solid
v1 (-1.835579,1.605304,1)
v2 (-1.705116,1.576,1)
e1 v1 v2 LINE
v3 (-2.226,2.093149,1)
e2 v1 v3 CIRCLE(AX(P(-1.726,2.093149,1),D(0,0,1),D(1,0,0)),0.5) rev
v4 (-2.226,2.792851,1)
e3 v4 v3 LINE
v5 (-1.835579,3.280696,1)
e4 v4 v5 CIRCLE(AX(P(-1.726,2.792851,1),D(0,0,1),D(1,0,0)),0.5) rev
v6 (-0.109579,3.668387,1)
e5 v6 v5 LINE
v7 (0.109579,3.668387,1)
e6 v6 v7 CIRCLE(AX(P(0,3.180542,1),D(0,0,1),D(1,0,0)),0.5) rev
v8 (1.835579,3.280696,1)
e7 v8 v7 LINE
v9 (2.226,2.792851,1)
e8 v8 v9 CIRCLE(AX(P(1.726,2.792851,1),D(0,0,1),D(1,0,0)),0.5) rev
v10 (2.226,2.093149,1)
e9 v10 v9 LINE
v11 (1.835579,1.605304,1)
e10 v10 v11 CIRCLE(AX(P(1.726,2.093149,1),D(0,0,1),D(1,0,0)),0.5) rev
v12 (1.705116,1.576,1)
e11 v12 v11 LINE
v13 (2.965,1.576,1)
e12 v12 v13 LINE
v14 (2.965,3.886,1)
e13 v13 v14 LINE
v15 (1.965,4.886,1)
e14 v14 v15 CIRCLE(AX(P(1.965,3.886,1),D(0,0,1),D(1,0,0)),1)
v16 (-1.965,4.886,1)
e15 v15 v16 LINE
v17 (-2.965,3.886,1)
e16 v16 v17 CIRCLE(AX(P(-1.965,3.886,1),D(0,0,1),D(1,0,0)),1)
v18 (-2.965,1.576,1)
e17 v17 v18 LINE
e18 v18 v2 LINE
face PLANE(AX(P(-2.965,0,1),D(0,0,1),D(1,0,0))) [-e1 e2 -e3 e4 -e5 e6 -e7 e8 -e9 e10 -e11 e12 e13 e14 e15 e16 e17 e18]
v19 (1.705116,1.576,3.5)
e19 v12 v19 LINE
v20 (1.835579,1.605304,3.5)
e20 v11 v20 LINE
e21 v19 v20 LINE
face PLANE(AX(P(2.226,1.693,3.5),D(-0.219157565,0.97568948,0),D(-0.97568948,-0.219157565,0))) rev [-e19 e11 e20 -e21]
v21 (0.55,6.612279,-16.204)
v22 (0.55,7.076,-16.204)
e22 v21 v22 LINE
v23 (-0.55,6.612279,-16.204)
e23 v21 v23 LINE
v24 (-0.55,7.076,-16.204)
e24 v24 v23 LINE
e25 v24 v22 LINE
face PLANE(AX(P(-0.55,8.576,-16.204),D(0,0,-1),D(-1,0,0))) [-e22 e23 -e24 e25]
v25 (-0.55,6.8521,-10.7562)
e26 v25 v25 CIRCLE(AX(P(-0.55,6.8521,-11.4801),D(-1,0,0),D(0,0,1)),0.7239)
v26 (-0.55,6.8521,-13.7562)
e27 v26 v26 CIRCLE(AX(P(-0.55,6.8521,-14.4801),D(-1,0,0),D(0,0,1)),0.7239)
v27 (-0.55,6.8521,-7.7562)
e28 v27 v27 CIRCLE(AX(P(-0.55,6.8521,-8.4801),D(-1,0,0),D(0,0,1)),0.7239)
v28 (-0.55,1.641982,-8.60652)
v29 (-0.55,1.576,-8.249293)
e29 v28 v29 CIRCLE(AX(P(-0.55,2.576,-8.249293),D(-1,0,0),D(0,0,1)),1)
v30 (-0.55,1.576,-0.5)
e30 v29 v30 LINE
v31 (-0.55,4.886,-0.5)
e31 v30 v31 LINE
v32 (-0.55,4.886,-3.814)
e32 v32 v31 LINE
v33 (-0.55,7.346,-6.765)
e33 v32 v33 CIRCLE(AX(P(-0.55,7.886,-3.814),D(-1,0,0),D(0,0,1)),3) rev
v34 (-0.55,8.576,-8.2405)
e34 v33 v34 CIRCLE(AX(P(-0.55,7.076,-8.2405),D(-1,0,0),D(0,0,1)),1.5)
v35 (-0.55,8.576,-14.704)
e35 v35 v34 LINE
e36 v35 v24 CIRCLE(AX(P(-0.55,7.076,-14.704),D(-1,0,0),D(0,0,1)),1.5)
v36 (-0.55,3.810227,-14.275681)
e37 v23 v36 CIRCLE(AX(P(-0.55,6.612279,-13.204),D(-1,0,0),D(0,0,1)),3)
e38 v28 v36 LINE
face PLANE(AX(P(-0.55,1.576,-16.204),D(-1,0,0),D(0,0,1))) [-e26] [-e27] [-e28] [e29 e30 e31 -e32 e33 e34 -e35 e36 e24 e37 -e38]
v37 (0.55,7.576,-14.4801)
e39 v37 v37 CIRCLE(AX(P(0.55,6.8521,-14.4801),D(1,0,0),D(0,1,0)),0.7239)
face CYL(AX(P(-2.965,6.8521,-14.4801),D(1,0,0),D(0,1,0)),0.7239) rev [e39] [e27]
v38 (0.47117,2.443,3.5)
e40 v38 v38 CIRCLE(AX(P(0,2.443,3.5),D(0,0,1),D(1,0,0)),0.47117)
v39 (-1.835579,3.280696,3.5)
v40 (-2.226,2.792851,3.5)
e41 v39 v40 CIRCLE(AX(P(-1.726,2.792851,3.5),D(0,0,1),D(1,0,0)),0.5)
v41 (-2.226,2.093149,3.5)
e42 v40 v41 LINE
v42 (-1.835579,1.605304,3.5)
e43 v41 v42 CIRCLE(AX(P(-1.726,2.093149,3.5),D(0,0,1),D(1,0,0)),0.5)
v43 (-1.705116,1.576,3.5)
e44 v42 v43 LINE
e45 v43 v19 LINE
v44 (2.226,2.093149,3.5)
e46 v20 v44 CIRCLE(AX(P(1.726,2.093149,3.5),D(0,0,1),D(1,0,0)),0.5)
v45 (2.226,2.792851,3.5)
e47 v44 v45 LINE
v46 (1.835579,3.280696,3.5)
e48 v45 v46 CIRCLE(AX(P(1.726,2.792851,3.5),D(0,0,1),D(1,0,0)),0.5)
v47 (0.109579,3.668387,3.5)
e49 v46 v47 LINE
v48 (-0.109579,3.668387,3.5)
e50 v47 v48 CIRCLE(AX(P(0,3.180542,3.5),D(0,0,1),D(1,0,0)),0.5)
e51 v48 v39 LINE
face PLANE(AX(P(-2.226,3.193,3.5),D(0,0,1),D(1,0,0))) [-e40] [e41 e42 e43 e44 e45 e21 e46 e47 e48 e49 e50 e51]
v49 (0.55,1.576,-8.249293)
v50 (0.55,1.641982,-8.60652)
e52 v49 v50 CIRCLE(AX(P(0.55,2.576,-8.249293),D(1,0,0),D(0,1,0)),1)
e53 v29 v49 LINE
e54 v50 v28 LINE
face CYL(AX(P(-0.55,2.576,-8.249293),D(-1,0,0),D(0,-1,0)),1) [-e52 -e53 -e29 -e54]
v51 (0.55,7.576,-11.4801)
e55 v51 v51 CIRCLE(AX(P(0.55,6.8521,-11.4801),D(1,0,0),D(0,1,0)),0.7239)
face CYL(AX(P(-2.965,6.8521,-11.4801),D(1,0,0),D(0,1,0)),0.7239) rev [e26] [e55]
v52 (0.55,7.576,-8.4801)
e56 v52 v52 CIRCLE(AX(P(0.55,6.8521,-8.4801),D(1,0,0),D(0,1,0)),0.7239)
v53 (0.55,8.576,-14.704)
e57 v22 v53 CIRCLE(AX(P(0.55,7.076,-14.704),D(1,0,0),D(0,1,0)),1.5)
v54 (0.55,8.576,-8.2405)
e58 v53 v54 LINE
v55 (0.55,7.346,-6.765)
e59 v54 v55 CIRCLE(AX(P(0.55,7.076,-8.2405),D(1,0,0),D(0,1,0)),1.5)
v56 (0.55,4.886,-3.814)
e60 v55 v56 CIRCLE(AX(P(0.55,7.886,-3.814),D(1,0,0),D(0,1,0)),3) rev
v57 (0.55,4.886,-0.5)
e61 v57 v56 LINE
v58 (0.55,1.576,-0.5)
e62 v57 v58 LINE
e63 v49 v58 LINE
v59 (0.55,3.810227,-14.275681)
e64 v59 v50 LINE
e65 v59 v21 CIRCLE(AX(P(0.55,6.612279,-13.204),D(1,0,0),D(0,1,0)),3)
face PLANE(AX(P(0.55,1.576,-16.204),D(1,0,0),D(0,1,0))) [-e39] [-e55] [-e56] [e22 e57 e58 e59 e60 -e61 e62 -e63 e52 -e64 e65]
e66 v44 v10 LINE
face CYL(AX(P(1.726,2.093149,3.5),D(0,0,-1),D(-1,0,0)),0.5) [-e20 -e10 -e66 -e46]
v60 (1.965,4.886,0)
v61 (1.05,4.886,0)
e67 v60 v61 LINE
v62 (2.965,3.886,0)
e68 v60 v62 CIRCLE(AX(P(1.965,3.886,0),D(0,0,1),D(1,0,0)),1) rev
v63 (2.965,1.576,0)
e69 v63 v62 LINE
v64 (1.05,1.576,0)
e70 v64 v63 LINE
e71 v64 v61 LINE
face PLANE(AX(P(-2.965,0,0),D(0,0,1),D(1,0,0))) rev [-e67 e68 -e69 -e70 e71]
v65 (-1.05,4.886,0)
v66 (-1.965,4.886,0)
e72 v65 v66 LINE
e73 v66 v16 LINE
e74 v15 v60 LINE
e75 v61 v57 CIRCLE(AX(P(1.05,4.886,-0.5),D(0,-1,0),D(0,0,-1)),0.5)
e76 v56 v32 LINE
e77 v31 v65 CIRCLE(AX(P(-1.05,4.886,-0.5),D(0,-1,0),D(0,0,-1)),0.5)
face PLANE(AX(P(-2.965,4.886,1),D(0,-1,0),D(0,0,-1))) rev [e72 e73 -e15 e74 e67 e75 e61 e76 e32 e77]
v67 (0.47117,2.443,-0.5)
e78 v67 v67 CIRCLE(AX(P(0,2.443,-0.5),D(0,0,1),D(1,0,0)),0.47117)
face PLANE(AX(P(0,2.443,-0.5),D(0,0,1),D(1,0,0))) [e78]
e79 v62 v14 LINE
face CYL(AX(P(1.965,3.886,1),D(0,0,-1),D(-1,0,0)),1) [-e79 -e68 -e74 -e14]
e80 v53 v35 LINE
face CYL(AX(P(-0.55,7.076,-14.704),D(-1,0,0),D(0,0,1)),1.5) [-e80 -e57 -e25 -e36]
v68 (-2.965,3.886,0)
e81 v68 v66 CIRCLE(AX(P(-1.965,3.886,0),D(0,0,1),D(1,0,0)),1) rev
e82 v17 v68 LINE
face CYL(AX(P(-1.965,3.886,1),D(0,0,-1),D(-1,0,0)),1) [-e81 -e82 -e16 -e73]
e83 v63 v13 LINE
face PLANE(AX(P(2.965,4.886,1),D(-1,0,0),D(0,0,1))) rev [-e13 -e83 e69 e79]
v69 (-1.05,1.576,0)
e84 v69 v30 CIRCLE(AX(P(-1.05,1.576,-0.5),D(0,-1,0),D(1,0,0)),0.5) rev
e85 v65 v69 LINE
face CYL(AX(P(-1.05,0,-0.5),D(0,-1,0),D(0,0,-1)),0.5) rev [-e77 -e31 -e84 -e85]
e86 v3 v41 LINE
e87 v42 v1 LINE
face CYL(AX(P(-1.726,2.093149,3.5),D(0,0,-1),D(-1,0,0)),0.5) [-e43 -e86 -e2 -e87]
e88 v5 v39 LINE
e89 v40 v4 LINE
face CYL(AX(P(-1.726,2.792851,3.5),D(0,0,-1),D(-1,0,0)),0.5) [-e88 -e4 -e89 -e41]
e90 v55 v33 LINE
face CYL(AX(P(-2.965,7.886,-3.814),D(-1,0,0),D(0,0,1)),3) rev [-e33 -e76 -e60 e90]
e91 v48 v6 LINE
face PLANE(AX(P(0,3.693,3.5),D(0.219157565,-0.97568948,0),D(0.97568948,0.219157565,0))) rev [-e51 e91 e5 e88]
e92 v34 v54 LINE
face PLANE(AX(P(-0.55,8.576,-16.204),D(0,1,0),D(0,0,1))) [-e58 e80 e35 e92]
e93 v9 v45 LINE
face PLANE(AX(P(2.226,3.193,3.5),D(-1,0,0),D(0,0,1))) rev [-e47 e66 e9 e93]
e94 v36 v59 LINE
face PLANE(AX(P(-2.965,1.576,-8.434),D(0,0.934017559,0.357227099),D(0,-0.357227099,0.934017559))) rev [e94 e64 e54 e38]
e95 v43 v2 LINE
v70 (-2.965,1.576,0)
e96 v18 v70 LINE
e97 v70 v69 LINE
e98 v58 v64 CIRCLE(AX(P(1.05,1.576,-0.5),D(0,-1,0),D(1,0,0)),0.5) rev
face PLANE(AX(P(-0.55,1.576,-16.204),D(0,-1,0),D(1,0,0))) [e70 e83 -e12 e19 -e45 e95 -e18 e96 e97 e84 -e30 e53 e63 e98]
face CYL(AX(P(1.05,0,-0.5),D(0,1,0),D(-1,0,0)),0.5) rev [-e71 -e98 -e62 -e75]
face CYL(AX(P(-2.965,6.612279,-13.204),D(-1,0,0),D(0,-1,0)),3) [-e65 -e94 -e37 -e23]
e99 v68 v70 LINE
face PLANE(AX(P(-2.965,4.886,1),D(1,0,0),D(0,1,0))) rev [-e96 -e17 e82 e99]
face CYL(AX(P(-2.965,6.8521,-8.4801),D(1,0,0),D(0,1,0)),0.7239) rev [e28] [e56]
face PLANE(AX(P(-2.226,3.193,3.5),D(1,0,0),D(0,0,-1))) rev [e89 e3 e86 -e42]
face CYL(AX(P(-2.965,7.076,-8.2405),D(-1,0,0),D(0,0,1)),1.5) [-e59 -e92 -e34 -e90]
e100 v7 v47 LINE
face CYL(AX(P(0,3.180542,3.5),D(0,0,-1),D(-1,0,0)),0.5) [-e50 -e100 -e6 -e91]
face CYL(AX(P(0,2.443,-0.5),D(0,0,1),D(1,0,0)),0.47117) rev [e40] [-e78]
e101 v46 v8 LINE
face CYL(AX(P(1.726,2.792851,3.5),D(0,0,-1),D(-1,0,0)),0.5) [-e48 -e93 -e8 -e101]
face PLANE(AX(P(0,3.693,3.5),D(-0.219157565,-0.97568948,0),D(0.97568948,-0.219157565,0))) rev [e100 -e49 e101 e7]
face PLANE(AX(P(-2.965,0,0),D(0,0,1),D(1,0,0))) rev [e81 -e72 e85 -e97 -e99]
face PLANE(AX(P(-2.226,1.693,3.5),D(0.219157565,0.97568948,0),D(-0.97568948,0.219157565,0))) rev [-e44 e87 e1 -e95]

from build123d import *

# Parameters (mm, degrees)
SKETCH3_W                      = 5.93
SKETCH3_H                      = 4.886
MOUNT_BASE_PLATE_DEPTH         = 1
HORN_LEVER_PROFILE_W           = 1.1
HORN_LEVER_PROFILE_H           = 7
LEVER_PROFILE_DEPTH            = 16.204
LOWER_CH_FRONT_DIVOT_W         = 6.814
LOWER_CH_FRONT_DIVOT_H         = 3.69
FRONT_BASE_PROFILE_CUT_DEPTH   = 19.667421273
REAR_PROFILE_CUT_DEPTH         = 19.667421273
F_3_HOLES_R                    = 0.7239
F_3_HOLES_CIUT_DEPTH           = 19.667421273
THRU_BASE_MOUNT_TAB_DEPTH      = 2.5
SKETCH9_R                      = 0.47117
THRU_BASE_MOUNT_TAB_HOLE_DEPTH = 4
BASE_PLATE_CORNER_FILLET_R     = 1
FRONT_LEVER_UNDER_FILLET_R     = 3
FRONT_LEVER_TOP_FILLETS_R      = 1.5
REAR_TOP_FILLET_R              = 3
SIDE_BASE_LEVER_ARM_FILLETS_R  = 0.5
THRU_BASE_MOUNT_TAB_FILLETS_R  = 0.5
BOT_MIIDLEVER_ANGLE_FILLET_R   = 1


with BuildPart() as part:
    # Sketch3 → Mount Base Plate (new body)
    with BuildSketch(Plane.XY):
        with Locations((0, 2.443)):
            Rectangle(SKETCH3_W, SKETCH3_H)
    extrude(amount=MOUNT_BASE_PLATE_DEPTH)

    # Horn Lever Profile → Lever Profile (add)
    with BuildSketch(Plane.XY):
        with Locations((0, 5.076)):
            Rectangle(HORN_LEVER_PROFILE_W, HORN_LEVER_PROFILE_H)
    extrude(amount=-LEVER_PROFILE_DEPTH)

    # Lower CH Front Divot → Front Base Profile Cut (cut, through all)
    with BuildSketch(Plane(origin=(0.55, 0, 0), x_dir=(0, 0, -1), z_dir=(1, 0, 0))):
        with Locations((3.407, 6.731)):
            Rectangle(LOWER_CH_FRONT_DIVOT_W, LOWER_CH_FRONT_DIVOT_H)
    extrude(amount=-FRONT_BASE_PROFILE_CUT_DEPTH, mode=Mode.SUBTRACT)

    # Sketch6 → Rear Profile Cut (cut, through all)
    with BuildSketch(Plane(origin=(0.55, 0, 0), x_dir=(0, 0, -1), z_dir=(1, 0, 0))):
        Polygon((8.434, 1.576), (16.204, 4.547737021), (16.204, 1.576), align=None)
    extrude(amount=-REAR_PROFILE_CUT_DEPTH, mode=Mode.SUBTRACT)

    # 3 Holes → 3 Holes Ciut (cut, through all)
    with BuildSketch(Plane(origin=(0.55, 0, 0), x_dir=(0, 0, -1), z_dir=(1, 0, 0))):
        with Locations(Location((14.4801, 6.8521, 0), (0, 0, 90))):
            Circle(F_3_HOLES_R)
        with Locations(Location((11.4801, 6.8521, 0), (0, 0, 90))):
            Circle(F_3_HOLES_R)
        with Locations(Location((8.4801, 6.8521, 0), (0, 0, 90))):
            Circle(F_3_HOLES_R)
    extrude(amount=-F_3_HOLES_CIUT_DEPTH, mode=Mode.SUBTRACT)

    # Thru Surface Base Ext → Thru Base Mount Tab (add)
    with BuildSketch(Plane.XY.offset(1)):
        Polygon((0, 3.693), (2.226, 3.193), (2.226, 1.693), (0, 1.193), (-2.226, 1.693), (-2.226, 3.193), align=None)
    extrude(amount=THRU_BASE_MOUNT_TAB_DEPTH)

    # Sketch9 → Thru Base Mount Tab Hole (cut)
    with BuildSketch(Plane.XY.offset(3.5)):
        with Locations((0, 2.443)):
            Circle(SKETCH9_R)
    extrude(amount=-THRU_BASE_MOUNT_TAB_HOLE_DEPTH, mode=Mode.SUBTRACT)

    # Base Plate Corner Fillet
    base_plate_corner_fillet_edges = [part.edges().sort_by_distance(p)[0] for p in [
        (-2.965, 4.886, 0.5),
        (2.965, 4.886, 0.5),
        (2.965, 0, 0.5),
        (-2.965, 0, 0.5),
    ]]
    fillet(base_plate_corner_fillet_edges, radius=BASE_PLATE_CORNER_FILLET_R)

    # Front Lever Under Fillet
    front_lever_under_fillet_edges = [part.edges().sort_by_distance(p)[0] for p in [
        (0, 4.886, -6.814),
    ]]
    fillet(front_lever_under_fillet_edges, radius=FRONT_LEVER_UNDER_FILLET_R)

    # Front Lever Top Fillets
    # the kernel refuses this fillet: 1.5 mm, written as the material it takes off along each edge
    with BuildSketch(Plane(origin=(4.3, 8.576, -16.204), x_dir=(0, 0, 1), z_dir=(-1, 0, 0))) as front_lever_top_fillets_piece_1:
        with BuildLine():
            CenterArc((FRONT_LEVER_TOP_FILLETS_R, -FRONT_LEVER_TOP_FILLETS_R), FRONT_LEVER_TOP_FILLETS_R, 90, 90)
            Line((0, -FRONT_LEVER_TOP_FILLETS_R), (0, 0))
            Line((0, 0), (FRONT_LEVER_TOP_FILLETS_R, 0))
        make_face()
    extrude(amount=8.6, mode=Mode.SUBTRACT)
    with BuildSketch(Plane(origin=(4.116249365, 8.576, -6.814), x_dir=(0, -0.9992074286085749, 0.03980596203384177), z_dir=(-1, 0, 0))) as front_lever_top_fillets_piece_2:
        with BuildLine():
            CenterArc((1.442027948, -1.485078086), FRONT_LEVER_TOP_FILLETS_R, 98.088443448, 79.630240195)
            Line((-0.056783195, -1.425369143), (-0.206664309, -1.419398249))
            Line((-0.206664309, -1.419398249), (-0.149881114, 0.005970894))
            Line((-0.149881114, 0.005970894), (0.005970894, 0.149881114))
            ThreePointArc((0.005970894, 0.149881114), (0.69542402, 0.122415), (1.209870405, 0.148507809))
            Line((1.209870405, 0.148507809), (1.230975636, 0))
        make_face()
    extrude(amount=8.232498729, mode=Mode.SUBTRACT)

    # Rear Top Fillet
    rear_top_fillet_edges = [part.edges().sort_by_distance(p)[0] for p in [
        (0, 4.547737021, -16.204),
    ]]
    fillet(rear_top_fillet_edges, radius=REAR_TOP_FILLET_R)

    # Side Base Lever Arm Fillets
    side_base_lever_arm_fillets_edges = [part.edges().sort_by_distance(p)[0] for p in [
        (-0.55, 3.231, 0),
        (0.55, 3.231, 0),
    ]]
    fillet(side_base_lever_arm_fillets_edges, radius=SIDE_BASE_LEVER_ARM_FILLETS_R)

    # Thru base Mount Tab Fillets
    thru_base_mount_tab_fillets_edges = [part.edges().sort_by_distance(p)[0] for p in [
        (0, 3.693, 2.25),
        (-2.226, 3.193, 2.25),
        (-2.226, 1.693, 2.25),
        (0, 1.193, 2.25),
        (2.226, 1.693, 2.25),
        (2.226, 3.193, 2.25),
    ]]
    fillet(thru_base_mount_tab_fillets_edges, radius=THRU_BASE_MOUNT_TAB_FILLETS_R)

    # Bot MiidLever Angle Fillet
    bot_miidlever_angle_fillet_edges = [part.edges().sort_by_distance(p)[0] for p in [
        (0, 1.576, -8.434),
    ]]
    fillet(bot_miidlever_angle_fillet_edges, radius=BOT_MIIDLEVER_ANGLE_FILLET_R)

    # SurfaceCut1
    split(bisect_by=Plane.XZ.offset(-1.576), keep=Keep.BOTTOM)


solid = part.part
